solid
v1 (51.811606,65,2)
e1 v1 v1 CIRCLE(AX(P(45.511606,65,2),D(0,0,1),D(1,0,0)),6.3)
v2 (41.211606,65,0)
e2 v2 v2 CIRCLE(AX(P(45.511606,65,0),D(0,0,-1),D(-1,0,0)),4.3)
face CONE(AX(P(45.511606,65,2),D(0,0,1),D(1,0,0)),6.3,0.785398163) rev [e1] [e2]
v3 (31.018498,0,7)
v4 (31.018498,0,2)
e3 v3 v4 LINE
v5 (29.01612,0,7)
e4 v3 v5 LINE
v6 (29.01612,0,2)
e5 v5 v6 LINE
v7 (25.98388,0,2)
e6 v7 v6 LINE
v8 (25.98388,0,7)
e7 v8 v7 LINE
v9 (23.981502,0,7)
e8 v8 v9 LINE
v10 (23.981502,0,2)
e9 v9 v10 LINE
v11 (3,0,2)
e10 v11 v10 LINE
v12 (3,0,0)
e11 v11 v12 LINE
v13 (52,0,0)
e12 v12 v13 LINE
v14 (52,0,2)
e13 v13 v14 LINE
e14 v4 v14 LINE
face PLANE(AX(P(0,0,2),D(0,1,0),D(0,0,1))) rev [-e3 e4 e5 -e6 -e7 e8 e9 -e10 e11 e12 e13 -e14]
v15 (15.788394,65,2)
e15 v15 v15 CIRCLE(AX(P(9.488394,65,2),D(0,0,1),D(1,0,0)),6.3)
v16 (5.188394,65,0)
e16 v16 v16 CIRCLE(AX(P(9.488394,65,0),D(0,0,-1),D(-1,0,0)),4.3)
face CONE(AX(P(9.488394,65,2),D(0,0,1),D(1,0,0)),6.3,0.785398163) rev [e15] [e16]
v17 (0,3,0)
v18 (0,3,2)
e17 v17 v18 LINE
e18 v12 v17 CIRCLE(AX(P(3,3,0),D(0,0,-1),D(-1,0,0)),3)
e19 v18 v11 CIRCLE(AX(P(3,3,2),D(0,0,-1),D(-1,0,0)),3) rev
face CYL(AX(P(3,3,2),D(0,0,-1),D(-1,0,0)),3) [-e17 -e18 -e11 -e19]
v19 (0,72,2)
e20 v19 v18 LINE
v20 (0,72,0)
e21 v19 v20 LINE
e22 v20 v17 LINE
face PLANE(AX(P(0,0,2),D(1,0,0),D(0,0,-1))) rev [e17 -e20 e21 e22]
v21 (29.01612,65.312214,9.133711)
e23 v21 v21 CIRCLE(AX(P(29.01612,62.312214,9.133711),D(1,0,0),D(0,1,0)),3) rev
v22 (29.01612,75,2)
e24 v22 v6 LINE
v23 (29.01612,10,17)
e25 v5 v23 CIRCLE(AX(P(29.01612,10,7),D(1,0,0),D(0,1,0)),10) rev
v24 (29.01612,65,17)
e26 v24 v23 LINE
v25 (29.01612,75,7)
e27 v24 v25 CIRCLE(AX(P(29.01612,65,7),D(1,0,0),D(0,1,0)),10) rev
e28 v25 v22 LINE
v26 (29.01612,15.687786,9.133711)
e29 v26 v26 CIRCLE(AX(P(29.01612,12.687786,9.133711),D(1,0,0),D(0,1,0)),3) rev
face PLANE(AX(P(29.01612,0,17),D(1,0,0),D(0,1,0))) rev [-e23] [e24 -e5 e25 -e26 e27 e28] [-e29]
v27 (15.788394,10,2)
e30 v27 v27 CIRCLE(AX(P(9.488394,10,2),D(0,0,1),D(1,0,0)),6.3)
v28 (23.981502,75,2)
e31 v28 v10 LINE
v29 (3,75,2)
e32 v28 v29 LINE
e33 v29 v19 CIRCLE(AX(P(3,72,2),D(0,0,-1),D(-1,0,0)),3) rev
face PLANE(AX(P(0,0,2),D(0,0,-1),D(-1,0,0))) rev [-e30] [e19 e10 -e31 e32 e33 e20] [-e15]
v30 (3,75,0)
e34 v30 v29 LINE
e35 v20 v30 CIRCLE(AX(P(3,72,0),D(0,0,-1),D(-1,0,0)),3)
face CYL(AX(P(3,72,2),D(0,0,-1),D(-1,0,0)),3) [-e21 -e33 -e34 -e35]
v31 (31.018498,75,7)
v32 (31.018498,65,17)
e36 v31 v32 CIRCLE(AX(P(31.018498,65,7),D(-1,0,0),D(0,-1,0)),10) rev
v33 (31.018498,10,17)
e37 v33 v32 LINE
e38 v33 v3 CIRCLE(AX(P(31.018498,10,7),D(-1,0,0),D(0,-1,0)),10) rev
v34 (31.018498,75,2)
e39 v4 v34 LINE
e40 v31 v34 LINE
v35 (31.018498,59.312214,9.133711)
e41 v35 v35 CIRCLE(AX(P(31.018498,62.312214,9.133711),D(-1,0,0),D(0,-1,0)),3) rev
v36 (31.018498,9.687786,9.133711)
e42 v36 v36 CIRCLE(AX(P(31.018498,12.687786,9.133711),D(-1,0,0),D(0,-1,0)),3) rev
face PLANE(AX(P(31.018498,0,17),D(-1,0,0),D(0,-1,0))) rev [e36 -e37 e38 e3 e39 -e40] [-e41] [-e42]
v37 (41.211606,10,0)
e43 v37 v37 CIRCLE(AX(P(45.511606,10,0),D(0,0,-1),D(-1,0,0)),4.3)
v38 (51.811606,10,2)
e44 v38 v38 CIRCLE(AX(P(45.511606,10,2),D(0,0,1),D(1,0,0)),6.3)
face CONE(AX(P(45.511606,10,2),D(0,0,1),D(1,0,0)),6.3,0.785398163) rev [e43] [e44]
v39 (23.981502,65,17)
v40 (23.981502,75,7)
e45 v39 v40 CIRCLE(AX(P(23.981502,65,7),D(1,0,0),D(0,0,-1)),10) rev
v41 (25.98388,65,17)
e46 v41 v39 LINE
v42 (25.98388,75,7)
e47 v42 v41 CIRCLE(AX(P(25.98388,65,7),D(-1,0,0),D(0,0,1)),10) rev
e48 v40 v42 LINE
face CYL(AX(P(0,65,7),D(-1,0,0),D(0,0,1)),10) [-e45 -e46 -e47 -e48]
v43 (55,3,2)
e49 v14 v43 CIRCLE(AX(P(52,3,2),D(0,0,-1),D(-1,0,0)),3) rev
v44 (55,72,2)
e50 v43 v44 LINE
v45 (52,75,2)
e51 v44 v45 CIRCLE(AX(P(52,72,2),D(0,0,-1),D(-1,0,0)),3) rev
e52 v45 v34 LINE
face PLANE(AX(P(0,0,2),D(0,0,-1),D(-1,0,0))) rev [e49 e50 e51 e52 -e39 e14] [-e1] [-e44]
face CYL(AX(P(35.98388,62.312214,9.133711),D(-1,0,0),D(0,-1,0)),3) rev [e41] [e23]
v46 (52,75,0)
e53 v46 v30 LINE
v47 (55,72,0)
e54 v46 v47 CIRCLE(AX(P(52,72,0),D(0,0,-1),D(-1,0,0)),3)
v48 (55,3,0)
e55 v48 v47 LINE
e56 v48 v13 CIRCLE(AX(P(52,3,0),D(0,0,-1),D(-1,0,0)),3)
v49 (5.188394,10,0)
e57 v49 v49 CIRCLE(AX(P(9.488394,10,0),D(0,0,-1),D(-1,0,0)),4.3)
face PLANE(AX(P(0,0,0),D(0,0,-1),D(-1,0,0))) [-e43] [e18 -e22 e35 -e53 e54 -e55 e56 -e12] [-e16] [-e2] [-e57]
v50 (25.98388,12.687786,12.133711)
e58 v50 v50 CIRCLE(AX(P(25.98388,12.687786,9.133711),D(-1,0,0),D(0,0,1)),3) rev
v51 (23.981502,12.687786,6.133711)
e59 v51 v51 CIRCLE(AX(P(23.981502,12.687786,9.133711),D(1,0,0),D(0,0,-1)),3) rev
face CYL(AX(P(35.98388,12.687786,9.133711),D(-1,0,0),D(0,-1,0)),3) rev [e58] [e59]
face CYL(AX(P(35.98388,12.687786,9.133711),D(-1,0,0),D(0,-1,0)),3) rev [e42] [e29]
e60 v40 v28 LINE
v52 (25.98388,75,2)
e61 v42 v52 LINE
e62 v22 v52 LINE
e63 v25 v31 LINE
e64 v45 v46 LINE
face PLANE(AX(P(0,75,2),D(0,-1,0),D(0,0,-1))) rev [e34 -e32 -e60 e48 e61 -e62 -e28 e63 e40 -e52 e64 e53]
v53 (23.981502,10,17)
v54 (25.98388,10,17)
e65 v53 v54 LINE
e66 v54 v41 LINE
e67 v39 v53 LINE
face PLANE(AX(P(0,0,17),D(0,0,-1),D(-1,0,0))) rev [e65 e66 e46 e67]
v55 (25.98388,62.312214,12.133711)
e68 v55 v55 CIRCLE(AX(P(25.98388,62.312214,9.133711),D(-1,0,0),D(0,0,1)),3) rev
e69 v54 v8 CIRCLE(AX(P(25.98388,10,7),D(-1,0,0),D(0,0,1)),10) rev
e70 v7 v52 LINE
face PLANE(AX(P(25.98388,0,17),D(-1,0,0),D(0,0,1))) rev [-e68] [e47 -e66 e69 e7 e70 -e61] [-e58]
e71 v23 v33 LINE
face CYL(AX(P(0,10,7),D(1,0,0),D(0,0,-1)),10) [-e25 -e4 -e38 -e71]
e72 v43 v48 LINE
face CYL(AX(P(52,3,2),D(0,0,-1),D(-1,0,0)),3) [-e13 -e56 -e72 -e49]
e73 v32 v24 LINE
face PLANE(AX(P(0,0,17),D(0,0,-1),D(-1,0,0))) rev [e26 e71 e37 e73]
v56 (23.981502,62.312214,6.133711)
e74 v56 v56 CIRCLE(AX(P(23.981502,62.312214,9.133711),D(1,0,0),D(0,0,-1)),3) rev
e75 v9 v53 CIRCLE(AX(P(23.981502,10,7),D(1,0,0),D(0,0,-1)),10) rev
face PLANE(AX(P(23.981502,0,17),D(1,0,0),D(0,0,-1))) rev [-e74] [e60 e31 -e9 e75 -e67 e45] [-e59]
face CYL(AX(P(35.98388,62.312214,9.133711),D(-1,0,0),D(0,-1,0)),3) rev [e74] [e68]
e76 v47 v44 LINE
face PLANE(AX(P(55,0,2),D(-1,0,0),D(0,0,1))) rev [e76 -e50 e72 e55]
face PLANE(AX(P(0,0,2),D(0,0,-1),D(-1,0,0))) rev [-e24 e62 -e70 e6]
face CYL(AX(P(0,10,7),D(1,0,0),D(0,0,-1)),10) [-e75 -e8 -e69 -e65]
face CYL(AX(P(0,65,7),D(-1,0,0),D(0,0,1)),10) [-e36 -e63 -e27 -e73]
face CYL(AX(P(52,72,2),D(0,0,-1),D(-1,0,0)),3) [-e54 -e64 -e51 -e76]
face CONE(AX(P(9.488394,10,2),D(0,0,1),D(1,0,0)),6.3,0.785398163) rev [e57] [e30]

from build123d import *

# Parameters (mm, degrees)
ESQUISSE1_W                  = 55
ESQUISSE1_H                  = 75
BOSS_EXTRU_1_DEPTH           = 2
ESQUISSE2_W                  = 2.002378602
ESQUISSE2_H                  = 75
BOSS_EXTRU_2_DEPTH           = 15
CONG_1_R                     = 3
CONG_2_R                     = 10
ENL_V_MAT_EXTRU_1_DEPTH      = 10
ENL_V_MAT_EXTRU_1_DEPTH_BACK = 83.194496151
ESQUISSE6_R                  = 3


# Read off the part's stored shape, not the designer's step: Fraisage pour vis à tête fraisée M61
with BuildPart() as part:
    # Esquisse1 → Boss.-Extru.1 (new body)
    with BuildSketch(Plane.XY):
        with Locations((27.5, 37.5)):
            Rectangle(ESQUISSE1_W, ESQUISSE1_H)
    extrude(amount=BOSS_EXTRU_1_DEPTH)

    # Esquisse2 → Boss.-Extru.2 (add)
    with BuildSketch(Plane.XY.offset(2)):
        with Locations((30.017308917, 37.5)):
            Rectangle(ESQUISSE2_W, ESQUISSE2_H)
        with Locations((24.982691083, 37.5)):
            Rectangle(ESQUISSE2_W, ESQUISSE2_H)
    extrude(amount=BOSS_EXTRU_2_DEPTH)

    # Congé1
    cong_1_edges = [part.edges().sort_by_distance(p)[0] for p in [
        (0, 75, 1),
        (55, 75, 1),
        (55, 0, 1),
        (0, 0, 1),
    ]]
    fillet(cong_1_edges, radius=CONG_1_R)

    # Congé2
    cong_2_edges = [part.edges().sort_by_distance(p)[0] for p in [
        (24.982691083, 75, 17),
        (24.982691083, 0, 17),
        (30.017308917, 0, 17),
        (30.017308917, 75, 17),
    ]]
    fillet(cong_2_edges, radius=CONG_2_R)

    # Fraisage pour vis à tête fraisée M61 out → Fraisage pour vis à tête fraisée M61 (revolve, cut)
    with BuildSketch(Plane(origin=(45.511606252, 65, 0), x_dir=(1, 0, 0), z_dir=(0, -1, 0))):
        Polygon((6.3, 2), (0, 2), (0, 0), (4.3, 0), align=None)
    revolve(axis=Axis((45.511606252, 65, 0), (0, 0, 1)), mode=Mode.SUBTRACT)

    # Fraisage pour vis _ t_te frais_e M61 2 o → Fraisage pour vis _ t_te frais_e M61 2 (revolve, cut)
    with BuildSketch(Plane(origin=(45.511606252, 10, 0), x_dir=(1, 0, 0), z_dir=(0, -1, 0))):
        Polygon((6.3, 2), (0, 2), (0, 0), (4.3, 0), align=None)
    revolve(axis=Axis((45.511606252, 10, 0), (0, 0, 1)), mode=Mode.SUBTRACT)

    # Fraisage pour vis _ t_te frais_e M61 3 o → Fraisage pour vis _ t_te frais_e M61 3 (revolve, cut)
    with BuildSketch(Plane(origin=(9.488393748, 10, 0), x_dir=(1, 0, 0), z_dir=(0, -1, 0))):
        Polygon((6.3, 2), (0, 2), (0, 0), (4.3, 0), align=None)
    revolve(axis=Axis((9.488393748, 10, 0), (0, 0, 1)), mode=Mode.SUBTRACT)

    # Fraisage pour vis _ t_te frais_e M61 4 o → Fraisage pour vis _ t_te frais_e M61 4 (revolve, cut)
    with BuildSketch(Plane(origin=(9.488393748, 65, 0), x_dir=(1, 0, 0), z_dir=(0, -1, 0))):
        Polygon((6.3, 2), (0, 2), (0, 0), (4.3, 0), align=None)
    revolve(axis=Axis((9.488393748, 65, 0), (0, 0, 1)), mode=Mode.SUBTRACT)

    # Esquisse6 → Enlèv. mat.-Extru.1 (cut, two sides: drawn at the far end of the back side and taken through both)
    with BuildSketch(Plane(origin=(25.983880384, 0, 0), x_dir=(0, 0, -1), z_dir=(1, 0, 0)).offset(-ENL_V_MAT_EXTRU_1_DEPTH_BACK)):
        with Locations(Location((-9.133710771, 62.312214024, 0), (0, 0, 270))):
            Circle(ESQUISSE6_R)
        with Locations(Location((-9.133710771, 12.687785976, 0), (0, 0, 270))):
            Circle(ESQUISSE6_R)
    extrude(amount=ENL_V_MAT_EXTRU_1_DEPTH + ENL_V_MAT_EXTRU_1_DEPTH_BACK, mode=Mode.SUBTRACT)


solid = part.part
